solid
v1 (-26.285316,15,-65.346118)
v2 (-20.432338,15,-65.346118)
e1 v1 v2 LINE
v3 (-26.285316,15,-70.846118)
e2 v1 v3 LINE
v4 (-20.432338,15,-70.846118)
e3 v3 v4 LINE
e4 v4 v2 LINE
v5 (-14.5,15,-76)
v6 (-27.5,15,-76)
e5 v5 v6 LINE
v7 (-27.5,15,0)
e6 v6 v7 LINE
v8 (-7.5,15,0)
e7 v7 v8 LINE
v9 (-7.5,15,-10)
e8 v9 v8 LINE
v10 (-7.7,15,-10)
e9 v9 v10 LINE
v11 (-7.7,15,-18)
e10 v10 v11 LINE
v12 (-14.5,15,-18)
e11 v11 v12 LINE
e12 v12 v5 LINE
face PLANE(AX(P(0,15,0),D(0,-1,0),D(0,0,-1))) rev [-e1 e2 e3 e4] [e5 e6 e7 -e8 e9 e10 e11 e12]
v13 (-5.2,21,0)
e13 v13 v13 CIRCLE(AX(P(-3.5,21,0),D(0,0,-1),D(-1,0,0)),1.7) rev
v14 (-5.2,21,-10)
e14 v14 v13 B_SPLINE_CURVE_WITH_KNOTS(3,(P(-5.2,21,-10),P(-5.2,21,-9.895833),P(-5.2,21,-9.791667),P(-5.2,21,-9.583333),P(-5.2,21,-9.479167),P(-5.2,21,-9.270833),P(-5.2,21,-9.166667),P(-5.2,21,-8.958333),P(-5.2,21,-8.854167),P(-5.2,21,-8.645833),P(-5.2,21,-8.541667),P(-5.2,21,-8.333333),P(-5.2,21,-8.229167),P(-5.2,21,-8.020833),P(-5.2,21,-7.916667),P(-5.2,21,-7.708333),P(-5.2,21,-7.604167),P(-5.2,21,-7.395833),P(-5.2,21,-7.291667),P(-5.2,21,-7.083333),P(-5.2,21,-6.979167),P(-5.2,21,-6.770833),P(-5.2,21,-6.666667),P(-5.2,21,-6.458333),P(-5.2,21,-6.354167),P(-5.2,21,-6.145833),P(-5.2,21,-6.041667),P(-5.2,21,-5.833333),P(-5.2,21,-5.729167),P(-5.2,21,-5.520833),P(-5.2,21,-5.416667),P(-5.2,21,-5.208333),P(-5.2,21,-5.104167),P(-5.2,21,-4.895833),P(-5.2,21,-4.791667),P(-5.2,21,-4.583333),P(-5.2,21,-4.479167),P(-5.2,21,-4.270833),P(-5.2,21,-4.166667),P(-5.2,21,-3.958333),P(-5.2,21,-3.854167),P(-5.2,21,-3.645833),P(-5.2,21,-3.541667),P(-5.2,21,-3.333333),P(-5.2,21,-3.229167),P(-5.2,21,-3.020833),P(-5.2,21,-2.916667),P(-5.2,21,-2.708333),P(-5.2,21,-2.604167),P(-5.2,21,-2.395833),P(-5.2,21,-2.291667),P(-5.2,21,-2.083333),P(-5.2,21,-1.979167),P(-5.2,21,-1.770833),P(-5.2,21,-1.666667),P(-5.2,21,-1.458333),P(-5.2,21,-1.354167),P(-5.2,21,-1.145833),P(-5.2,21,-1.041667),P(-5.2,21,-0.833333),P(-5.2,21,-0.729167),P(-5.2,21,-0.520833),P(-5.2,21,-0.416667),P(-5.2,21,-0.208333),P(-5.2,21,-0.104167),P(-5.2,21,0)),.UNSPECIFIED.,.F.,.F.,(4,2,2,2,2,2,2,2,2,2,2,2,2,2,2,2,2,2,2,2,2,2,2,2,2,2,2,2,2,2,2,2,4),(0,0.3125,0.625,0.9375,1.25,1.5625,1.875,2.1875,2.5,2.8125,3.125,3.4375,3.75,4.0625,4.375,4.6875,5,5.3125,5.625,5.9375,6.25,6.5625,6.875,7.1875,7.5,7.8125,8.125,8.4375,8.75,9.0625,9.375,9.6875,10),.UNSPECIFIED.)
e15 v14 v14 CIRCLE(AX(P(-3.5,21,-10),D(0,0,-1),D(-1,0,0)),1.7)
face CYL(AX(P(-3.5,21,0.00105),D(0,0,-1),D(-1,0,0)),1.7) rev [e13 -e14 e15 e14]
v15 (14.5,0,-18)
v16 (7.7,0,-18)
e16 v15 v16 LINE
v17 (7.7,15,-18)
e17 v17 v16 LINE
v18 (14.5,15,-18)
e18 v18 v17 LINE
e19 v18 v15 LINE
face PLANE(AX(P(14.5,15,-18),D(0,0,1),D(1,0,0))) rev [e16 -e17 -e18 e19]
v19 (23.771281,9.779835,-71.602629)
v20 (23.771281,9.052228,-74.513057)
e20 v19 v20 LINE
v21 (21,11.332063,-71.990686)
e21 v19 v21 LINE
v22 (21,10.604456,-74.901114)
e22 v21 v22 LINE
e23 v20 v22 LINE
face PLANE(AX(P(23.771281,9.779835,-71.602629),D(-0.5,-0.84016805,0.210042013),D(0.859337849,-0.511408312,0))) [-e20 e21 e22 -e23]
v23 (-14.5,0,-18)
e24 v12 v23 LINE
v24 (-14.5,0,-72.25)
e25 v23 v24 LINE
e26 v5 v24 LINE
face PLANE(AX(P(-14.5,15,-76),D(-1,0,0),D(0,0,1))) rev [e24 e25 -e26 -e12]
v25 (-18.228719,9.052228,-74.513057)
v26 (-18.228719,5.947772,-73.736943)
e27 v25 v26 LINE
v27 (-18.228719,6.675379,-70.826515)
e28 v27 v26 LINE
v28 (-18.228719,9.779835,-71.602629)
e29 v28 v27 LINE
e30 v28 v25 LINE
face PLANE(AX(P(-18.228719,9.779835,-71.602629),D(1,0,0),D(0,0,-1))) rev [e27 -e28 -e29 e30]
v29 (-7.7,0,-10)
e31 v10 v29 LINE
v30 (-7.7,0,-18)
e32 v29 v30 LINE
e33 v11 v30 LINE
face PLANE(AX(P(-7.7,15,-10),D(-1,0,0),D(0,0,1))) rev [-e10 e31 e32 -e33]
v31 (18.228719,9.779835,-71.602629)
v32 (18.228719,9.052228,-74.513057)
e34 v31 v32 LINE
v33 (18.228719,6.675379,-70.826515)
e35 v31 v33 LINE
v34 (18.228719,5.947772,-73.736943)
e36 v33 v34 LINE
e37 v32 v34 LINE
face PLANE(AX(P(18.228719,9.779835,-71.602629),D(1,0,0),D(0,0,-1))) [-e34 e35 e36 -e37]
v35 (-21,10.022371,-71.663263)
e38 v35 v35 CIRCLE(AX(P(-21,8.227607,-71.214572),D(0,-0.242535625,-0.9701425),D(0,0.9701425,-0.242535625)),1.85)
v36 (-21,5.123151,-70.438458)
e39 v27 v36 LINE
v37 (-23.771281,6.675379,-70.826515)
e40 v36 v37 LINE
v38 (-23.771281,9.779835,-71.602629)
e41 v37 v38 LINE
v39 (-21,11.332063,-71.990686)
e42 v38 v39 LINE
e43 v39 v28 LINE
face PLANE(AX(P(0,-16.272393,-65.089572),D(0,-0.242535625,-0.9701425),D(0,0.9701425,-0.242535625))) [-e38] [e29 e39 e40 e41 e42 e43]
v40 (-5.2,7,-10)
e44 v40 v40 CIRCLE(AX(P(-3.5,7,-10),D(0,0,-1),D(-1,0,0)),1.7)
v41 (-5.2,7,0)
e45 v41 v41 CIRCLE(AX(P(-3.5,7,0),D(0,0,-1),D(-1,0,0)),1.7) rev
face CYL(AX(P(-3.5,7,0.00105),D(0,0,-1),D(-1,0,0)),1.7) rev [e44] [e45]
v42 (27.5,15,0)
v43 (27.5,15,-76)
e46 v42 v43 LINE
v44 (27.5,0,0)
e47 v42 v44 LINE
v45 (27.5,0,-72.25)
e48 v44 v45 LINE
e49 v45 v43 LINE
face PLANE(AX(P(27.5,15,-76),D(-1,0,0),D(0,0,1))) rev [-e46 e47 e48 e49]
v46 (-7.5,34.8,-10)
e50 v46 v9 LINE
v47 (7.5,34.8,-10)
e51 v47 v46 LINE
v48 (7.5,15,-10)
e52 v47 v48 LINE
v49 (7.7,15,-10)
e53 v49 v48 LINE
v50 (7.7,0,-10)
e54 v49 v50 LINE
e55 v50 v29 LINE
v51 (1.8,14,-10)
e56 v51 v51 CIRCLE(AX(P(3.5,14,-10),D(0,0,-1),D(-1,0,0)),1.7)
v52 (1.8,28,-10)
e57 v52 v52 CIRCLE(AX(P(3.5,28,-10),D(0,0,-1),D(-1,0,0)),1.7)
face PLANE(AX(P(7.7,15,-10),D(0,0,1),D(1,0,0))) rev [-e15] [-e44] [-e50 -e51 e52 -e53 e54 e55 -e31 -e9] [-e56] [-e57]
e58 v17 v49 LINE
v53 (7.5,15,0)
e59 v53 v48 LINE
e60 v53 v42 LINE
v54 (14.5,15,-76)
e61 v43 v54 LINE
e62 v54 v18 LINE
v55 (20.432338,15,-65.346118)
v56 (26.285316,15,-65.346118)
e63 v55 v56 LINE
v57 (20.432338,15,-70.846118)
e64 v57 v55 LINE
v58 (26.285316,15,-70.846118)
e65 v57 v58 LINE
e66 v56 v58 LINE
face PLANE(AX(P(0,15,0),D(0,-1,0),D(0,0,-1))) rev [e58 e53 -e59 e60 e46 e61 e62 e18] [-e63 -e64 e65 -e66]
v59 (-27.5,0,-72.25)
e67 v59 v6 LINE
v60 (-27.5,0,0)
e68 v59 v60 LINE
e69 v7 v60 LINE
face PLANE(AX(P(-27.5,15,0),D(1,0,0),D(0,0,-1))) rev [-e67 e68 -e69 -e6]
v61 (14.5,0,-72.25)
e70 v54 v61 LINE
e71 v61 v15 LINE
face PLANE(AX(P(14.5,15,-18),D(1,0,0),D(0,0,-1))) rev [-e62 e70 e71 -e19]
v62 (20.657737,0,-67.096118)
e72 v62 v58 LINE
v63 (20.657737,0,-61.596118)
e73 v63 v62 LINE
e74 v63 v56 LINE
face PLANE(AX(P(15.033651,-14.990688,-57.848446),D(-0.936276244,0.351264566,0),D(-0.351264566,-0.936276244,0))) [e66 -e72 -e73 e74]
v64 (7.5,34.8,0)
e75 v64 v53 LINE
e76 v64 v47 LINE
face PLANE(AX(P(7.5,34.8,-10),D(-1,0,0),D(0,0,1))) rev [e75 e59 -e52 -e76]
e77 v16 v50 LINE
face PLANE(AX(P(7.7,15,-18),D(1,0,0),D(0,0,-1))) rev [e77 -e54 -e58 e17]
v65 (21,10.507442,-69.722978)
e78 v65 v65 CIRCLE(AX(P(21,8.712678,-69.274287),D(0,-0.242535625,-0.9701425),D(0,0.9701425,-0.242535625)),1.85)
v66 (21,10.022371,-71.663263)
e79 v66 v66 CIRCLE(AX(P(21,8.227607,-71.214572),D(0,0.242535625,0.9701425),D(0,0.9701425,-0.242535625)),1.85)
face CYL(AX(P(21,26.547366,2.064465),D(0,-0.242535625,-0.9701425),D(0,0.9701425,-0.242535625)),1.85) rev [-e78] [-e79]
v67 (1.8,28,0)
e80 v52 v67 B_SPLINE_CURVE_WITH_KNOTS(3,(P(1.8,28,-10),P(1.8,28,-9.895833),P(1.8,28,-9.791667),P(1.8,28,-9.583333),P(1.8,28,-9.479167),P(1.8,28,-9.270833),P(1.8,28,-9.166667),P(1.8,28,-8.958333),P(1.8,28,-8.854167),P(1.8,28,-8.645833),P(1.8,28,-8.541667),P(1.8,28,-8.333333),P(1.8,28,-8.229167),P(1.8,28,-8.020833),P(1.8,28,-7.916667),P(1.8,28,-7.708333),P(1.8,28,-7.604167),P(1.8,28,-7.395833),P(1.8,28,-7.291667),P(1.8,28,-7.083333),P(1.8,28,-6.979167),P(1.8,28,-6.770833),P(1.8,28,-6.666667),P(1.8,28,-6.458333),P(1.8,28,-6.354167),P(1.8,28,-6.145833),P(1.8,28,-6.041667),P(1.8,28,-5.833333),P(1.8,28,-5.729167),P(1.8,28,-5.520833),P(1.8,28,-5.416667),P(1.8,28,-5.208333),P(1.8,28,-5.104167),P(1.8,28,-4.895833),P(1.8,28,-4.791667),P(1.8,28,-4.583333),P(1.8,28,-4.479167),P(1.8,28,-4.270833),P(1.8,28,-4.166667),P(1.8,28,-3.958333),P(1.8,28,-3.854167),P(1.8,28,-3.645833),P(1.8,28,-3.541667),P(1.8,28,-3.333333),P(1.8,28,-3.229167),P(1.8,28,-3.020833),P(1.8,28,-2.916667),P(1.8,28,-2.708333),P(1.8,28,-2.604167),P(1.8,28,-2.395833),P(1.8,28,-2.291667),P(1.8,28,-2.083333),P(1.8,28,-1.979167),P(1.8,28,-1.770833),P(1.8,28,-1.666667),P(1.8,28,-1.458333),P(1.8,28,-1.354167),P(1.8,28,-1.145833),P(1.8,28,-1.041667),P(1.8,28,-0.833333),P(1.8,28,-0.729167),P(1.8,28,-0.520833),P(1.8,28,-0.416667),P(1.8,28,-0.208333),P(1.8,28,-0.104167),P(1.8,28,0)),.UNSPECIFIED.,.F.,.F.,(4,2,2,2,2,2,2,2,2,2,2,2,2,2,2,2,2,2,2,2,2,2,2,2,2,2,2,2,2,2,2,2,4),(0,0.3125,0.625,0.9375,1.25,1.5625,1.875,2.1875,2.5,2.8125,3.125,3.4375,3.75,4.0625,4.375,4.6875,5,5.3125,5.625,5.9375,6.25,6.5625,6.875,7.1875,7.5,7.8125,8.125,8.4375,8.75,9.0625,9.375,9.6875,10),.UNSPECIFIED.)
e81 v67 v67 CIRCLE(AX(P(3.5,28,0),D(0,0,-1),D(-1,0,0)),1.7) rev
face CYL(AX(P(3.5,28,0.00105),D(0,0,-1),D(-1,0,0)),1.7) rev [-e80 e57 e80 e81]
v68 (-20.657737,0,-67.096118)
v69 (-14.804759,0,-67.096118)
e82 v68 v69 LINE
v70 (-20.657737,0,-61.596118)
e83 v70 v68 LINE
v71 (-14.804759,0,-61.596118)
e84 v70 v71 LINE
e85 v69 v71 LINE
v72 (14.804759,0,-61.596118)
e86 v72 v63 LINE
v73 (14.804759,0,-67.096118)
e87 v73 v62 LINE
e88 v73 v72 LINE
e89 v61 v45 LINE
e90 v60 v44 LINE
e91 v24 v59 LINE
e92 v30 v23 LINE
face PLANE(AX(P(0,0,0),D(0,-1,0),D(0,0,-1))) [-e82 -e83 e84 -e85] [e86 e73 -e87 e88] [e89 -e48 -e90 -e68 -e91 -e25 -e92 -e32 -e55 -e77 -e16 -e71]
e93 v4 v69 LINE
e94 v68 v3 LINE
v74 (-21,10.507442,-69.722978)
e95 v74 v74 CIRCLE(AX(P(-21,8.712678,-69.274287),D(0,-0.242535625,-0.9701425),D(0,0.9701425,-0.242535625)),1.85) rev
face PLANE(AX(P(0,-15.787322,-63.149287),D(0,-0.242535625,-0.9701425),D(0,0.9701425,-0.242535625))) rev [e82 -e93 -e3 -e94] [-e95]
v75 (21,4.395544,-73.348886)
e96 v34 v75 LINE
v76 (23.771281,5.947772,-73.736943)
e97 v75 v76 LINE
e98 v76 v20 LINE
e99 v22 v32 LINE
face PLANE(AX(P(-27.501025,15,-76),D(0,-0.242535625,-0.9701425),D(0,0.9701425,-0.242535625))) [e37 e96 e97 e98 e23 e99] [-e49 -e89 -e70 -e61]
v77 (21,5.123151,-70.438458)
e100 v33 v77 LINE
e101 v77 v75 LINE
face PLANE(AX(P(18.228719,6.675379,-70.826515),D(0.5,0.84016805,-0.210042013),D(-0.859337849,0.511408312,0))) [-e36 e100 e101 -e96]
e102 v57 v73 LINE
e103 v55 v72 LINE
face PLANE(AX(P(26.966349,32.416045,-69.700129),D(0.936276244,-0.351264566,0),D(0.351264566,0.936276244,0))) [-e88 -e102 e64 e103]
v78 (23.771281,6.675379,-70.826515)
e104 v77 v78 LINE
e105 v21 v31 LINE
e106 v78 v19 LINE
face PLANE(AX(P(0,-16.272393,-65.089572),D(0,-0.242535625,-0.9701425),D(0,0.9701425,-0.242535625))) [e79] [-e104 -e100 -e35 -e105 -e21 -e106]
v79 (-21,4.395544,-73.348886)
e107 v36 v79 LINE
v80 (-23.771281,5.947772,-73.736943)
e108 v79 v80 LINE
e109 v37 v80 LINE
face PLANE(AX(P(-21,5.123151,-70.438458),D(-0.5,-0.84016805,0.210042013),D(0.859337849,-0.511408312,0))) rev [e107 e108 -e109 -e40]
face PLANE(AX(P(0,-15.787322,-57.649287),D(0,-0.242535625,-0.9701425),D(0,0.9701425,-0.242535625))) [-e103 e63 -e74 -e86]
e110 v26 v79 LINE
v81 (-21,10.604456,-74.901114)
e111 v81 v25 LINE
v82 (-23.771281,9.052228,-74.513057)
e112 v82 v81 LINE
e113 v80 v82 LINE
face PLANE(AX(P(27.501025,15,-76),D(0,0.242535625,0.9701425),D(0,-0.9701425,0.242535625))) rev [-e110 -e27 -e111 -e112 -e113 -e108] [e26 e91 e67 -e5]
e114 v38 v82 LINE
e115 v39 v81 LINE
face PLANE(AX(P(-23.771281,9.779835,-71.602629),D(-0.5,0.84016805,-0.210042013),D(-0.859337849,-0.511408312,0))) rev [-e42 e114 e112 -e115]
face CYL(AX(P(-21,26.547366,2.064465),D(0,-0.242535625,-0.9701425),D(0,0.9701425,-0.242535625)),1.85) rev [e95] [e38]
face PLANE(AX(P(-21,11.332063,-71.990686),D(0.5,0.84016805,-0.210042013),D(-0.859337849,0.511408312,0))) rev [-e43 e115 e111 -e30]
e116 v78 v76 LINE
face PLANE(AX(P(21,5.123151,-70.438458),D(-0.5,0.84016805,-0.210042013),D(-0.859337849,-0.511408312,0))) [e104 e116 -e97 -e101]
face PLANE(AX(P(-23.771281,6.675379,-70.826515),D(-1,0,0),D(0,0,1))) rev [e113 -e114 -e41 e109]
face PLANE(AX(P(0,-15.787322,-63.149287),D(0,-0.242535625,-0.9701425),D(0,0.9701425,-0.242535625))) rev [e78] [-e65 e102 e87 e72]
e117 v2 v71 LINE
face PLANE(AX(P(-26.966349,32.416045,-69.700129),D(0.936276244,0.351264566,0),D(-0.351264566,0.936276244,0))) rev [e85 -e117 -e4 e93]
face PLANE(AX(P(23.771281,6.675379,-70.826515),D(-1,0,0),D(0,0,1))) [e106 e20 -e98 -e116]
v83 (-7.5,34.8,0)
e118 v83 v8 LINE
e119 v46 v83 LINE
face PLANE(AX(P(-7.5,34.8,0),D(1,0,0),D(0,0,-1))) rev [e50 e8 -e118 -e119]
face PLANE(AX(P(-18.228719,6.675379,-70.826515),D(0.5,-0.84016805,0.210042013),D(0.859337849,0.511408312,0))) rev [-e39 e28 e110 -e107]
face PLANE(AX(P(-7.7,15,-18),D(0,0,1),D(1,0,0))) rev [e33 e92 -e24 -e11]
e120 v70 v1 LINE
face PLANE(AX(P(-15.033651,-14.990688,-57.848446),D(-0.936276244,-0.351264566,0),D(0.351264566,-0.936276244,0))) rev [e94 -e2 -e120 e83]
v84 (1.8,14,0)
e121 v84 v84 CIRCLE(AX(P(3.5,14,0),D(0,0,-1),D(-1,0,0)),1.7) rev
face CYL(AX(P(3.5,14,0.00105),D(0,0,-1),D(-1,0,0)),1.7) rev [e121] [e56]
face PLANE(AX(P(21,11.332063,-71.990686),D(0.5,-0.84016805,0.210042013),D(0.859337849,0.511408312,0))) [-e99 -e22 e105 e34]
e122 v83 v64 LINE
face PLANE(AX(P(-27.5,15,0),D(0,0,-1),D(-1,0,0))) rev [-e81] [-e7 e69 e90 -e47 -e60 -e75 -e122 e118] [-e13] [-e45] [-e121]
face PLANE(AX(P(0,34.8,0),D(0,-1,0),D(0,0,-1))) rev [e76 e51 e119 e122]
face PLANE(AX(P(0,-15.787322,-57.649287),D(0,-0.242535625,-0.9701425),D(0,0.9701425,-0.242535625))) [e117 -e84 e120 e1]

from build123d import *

# Parameters (mm, degrees)
BOSS_EXTRUDE1_DEPTH = 15
SKETCH2_W           = 15
SKETCH2_H           = 10
BOSS_EXTRUDE2_DEPTH = 19.8
CUT_EXTRUDE2_REACH  = 81.519
SKETCH4_R           = 1.7
LPATTERN1_COUNT     = 2
LPATTERN1_PITCH     = 14
CUT_EXTRUDE4_REACH  = 102.06
CUT_EXTRUDE5_START  = -38.811107067
CUT_EXTRUDE5_DEPTH  = 19.709275544
CUT_EXTRUDE6_DEPTH  = 3
CUT_EXTRUDE7_REACH  = 89.185
SKETCH10_R          = 1.85


# Read off the part's stored shape, not the designer's step: Cut-Extrude5
with BuildPart() as part:
    # Sketch1 → Boss-Extrude1 (new body)
    with BuildSketch(Plane(origin=(0, 0, 0), x_dir=(1, 0, 0), z_dir=(0, 1, 0))):
        Polygon((-27.5, 0), (27.5, 0), (27.5, 76), (14.5, 76), (14.5, 18), (7.7, 18), (7.7, 10), (-7.7, 10), (-7.7, 18), (-14.5, 18), (-14.5, 76), (-27.5, 76), align=None)
    extrude(amount=BOSS_EXTRUDE1_DEPTH)

    # Sketch2 → Boss-Extrude2 (add)
    with BuildSketch(Plane(origin=(0, 15, 0), x_dir=(1, 0, 0), z_dir=(0, 1, 0))):
        with Locations((0, 5)):
            Rectangle(SKETCH2_W, SKETCH2_H)
    extrude(amount=BOSS_EXTRUDE2_DEPTH)

    # Sketch4 → Cut-Extrude2 (cut, up to next)
    with BuildSketch(Plane(origin=(0, 0, -10), x_dir=(-1, 0, 0), z_dir=(0, 0, -1)), mode=Mode.PRIVATE) as cut_extrude2_sk1:
        with Locations((-3.5, 28)):
            Circle(SKETCH4_R)
    cut_extrude2_tool1 = extrude(cut_extrude2_sk1.sketch, amount=-CUT_EXTRUDE2_REACH, mode=Mode.PRIVATE) & part.part
    # Sketch4 → Cut-Extrude2 (cut, up to next)
    with BuildSketch(Plane(origin=(0, 0, -10), x_dir=(-1, 0, 0), z_dir=(0, 0, -1)), mode=Mode.PRIVATE) as cut_extrude2_sk2:
        with Locations((3.5, 21)):
            Circle(SKETCH4_R)
    cut_extrude2_tool2 = extrude(cut_extrude2_sk2.sketch, amount=-CUT_EXTRUDE2_REACH, mode=Mode.PRIVATE) & part.part
    cut_extrude2_1 = cut_extrude2_tool1.solids().sort_by_distance((3.5, 28, -10))[0]
    add(cut_extrude2_1, mode=Mode.SUBTRACT)
    cut_extrude2_2 = cut_extrude2_tool2.solids().sort_by_distance((-3.5, 21, -10))[0]
    add(cut_extrude2_2, mode=Mode.SUBTRACT)
    cut_extrude2 = cut_extrude2_1 + cut_extrude2_2  # Cut-Extrude2 as one shape, for the pattern or mirror that repeats it

    # LPattern1: Cut-Extrude2 ×2
    with Locations(*[(0, -i * LPATTERN1_PITCH, 0) for i in range(1, LPATTERN1_COUNT)]):
        add(cut_extrude2, mode=Mode.SUBTRACT)

    # Sketch7 → Cut-Extrude4 (cut, up to next)
    with BuildSketch(Plane.ZY.offset(27.5), mode=Mode.PRIVATE) as cut_extrude4_sk1:
        Polygon((-76, 15), (-72.25, 0), (-76, 0), align=None)
    cut_extrude4_tool1 = extrude(cut_extrude4_sk1.sketch, amount=-CUT_EXTRUDE4_REACH, mode=Mode.PRIVATE) & part.part
    cut_extrude4 = cut_extrude4_tool1.solids().sort_by_distance((-27.5, 5, -74.75))[0]
    add(cut_extrude4, mode=Mode.SUBTRACT)

    # Cut-Extrude5 outline → Cut-Extrude5 (cut)
    with BuildSketch(Plane(origin=(0, 0, 0), x_dir=(0.9396926207859096, 0.3318082769460259, -0.08295206923650612), z_dir=(0.34202014332566544, -0.9116357484973617, 0.2279089371243395)).offset(CUT_EXTRUDE5_START)):
        Polygon((-8.802397208, -59.757011885), (-14.302397208, -59.757011885), (-13.846160827, -65.092795636), (-8.346160827, -65.092795636), align=None)
    cut_extrude5 = extrude(amount=CUT_EXTRUDE5_DEPTH, mode=Mode.SUBTRACT)

    # Sketch9 → Cut-Extrude6 (cut)
    with BuildSketch(Plane(origin=(0, -17, -68), x_dir=(-1, 0, 0), z_dir=(0, -0.24253562503633286, -0.970142500145332))):
        Polygon((21, 22.054021957), (23.771281292, 23.654021957), (23.771281292, 26.854021957), (21, 28.454021957), (18.228718708, 26.854021957), (18.228718708, 23.654021957), align=None)
    cut_extrude6 = extrude(amount=-CUT_EXTRUDE6_DEPTH, mode=Mode.SUBTRACT)

    # Sketch10 → Cut-Extrude7 (cut, up to next)
    with BuildSketch(Plane(origin=(0, -16.272393125, -65.0895725), x_dir=(-1, 0, 0), z_dir=(0, -0.2425356250363299, -0.9701425001453328)), mode=Mode.PRIVATE) as cut_extrude7_sk1:
        with Locations(Location((21, 25.254021957, 0), (0, 0, 90))):
            Circle(SKETCH10_R)
    cut_extrude7_tool1 = extrude(cut_extrude7_sk1.sketch, amount=-CUT_EXTRUDE7_REACH, mode=Mode.PRIVATE) & part.part
    cut_extrude7 = cut_extrude7_tool1.solids().sort_by_distance((-21, 8.227607, -71.214572))[0]
    add(cut_extrude7, mode=Mode.SUBTRACT)

    # Mirror1: Cut-Extrude4, Cut-Extrude5, Cut-Extrude6, Cut-Extrude7 across plane
    add(cut_extrude4.mirror(Plane(origin=(0, 0, 0), x_dir=(0, 0, 1), z_dir=(1, 0, 0))), mode=Mode.SUBTRACT)
    add(cut_extrude5.mirror(Plane(origin=(0, 0, 0), x_dir=(0, 0, 1), z_dir=(1, 0, 0))), mode=Mode.SUBTRACT)
    add(cut_extrude6.mirror(Plane(origin=(0, 0, 0), x_dir=(0, 0, 1), z_dir=(1, 0, 0))), mode=Mode.SUBTRACT)
    add(cut_extrude7.mirror(Plane(origin=(0, 0, 0), x_dir=(0, 0, 1), z_dir=(1, 0, 0))), mode=Mode.SUBTRACT)


solid = part.part
